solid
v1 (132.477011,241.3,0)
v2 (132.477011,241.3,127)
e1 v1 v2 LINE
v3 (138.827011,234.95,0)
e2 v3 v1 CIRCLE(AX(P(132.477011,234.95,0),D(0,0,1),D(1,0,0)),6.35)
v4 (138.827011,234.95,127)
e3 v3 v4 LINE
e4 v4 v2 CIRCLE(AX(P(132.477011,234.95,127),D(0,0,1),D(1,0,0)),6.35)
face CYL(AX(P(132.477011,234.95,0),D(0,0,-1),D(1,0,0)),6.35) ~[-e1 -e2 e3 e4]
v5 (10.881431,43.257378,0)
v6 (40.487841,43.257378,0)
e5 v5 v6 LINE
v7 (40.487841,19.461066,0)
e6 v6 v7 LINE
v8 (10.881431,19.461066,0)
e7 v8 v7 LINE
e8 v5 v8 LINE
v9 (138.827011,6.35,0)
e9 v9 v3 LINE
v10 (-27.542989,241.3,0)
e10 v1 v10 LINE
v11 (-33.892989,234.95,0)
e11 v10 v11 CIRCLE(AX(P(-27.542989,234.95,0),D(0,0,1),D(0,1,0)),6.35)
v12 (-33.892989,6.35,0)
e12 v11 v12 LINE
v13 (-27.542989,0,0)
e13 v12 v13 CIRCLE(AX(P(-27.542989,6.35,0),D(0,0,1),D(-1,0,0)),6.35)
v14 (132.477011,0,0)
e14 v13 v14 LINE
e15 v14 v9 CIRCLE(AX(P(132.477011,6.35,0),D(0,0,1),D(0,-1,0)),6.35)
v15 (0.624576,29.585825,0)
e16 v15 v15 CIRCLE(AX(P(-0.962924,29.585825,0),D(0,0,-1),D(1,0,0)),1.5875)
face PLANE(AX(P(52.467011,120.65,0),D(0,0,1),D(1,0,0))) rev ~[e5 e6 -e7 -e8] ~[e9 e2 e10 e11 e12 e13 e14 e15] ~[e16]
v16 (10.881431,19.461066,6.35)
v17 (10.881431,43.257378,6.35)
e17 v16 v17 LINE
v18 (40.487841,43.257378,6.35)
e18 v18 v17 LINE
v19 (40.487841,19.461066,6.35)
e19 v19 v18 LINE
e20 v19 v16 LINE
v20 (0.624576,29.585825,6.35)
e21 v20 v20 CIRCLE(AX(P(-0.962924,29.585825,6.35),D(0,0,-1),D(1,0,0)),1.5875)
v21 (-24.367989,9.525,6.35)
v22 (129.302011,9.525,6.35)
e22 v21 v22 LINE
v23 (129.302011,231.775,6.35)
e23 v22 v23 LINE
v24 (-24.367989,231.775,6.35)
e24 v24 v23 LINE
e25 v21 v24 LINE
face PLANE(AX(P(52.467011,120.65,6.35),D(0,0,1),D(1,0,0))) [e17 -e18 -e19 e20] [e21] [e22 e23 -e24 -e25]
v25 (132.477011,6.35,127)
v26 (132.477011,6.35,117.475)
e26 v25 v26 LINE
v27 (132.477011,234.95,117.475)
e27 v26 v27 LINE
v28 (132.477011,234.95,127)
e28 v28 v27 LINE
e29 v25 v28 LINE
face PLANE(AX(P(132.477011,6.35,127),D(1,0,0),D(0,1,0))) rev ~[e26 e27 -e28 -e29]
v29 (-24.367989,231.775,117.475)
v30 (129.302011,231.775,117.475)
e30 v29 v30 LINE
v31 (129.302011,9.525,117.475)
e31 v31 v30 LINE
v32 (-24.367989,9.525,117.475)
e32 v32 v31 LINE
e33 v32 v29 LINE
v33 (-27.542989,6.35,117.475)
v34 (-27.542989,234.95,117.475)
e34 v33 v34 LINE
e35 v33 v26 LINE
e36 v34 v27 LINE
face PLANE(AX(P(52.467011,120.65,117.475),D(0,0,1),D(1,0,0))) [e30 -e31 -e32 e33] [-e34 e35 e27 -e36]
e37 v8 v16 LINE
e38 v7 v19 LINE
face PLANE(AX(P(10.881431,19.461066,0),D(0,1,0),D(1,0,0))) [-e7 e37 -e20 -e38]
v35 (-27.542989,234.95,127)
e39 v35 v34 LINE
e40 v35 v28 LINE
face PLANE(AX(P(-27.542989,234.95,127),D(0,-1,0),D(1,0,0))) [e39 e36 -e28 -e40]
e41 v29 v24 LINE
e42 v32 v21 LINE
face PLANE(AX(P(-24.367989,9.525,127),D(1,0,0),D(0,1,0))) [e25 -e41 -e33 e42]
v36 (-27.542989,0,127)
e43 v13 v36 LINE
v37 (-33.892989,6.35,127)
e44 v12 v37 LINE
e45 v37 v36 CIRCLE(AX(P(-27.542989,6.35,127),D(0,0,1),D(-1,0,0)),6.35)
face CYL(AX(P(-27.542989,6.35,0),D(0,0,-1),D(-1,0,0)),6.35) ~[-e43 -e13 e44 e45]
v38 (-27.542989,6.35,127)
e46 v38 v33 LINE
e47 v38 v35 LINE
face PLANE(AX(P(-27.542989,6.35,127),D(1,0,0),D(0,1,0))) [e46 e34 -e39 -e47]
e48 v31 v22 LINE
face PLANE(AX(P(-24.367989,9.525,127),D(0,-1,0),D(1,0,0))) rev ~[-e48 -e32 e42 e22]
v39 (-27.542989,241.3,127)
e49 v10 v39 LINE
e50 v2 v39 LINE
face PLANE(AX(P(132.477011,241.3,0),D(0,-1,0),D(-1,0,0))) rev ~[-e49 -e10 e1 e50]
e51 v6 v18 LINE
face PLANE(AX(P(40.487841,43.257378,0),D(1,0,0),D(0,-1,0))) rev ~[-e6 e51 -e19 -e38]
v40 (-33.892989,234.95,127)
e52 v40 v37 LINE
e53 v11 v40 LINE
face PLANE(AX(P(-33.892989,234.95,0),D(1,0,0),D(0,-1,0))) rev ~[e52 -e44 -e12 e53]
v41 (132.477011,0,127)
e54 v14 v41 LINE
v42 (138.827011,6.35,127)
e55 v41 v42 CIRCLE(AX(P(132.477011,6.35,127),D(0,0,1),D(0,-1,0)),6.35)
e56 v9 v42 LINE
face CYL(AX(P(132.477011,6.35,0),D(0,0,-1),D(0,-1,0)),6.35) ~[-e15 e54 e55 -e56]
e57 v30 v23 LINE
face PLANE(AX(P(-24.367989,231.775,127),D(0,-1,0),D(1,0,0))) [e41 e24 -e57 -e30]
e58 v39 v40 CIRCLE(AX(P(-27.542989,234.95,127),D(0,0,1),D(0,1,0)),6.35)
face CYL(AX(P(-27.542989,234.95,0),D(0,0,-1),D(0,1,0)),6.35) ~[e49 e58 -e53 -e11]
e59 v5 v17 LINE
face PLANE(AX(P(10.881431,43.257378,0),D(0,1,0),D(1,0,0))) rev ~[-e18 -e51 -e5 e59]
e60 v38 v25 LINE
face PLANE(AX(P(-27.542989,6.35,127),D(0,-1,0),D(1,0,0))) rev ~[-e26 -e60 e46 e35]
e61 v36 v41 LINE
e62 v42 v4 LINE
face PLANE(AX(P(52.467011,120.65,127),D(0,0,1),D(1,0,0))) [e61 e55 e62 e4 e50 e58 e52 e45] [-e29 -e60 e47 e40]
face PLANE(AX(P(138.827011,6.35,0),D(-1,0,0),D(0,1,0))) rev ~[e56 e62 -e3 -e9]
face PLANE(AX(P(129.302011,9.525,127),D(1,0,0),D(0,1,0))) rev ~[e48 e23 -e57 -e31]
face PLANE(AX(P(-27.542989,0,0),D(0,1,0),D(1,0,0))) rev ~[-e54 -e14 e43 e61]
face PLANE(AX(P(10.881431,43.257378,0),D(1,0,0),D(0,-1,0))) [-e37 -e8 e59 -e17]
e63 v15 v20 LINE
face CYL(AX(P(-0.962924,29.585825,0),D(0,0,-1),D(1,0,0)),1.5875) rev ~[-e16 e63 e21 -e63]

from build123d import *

# Parameters (mm, degrees)
F1_DEPTH = 127
F2_T     = 6.35
F3_W     = 160.02
F3_H     = 228.6
F3_W_2   = 153.67
F3_H_2   = 222.25
F4_DEPTH = 127
F5_DEPTH = 9.525
F6_R     = 1.5875
F7_DEPTH = 25.4
F8_W     = 29.6064093709
F8_H     = 23.796312511
F9_DEPTH = 25.4


# Not quite as in the source:
# - a shell that OpenCascade refuses in one call is made with other operations: the cavity is built on its own and cut out


with BuildPart() as f1:
    # F0 (on Top) → F1 (new body)
    with BuildSketch(Plane.XY):
        with BuildLine():
            ThreePointArc((-33.8929891586, 6.35), (-32.0331172192, 1.8598719395), (-27.5429891586, 0))
            Line((-27.5429891586, 0), (132.4770108414, 0))
            ThreePointArc((132.4770108414, 0), (136.9671389019, 1.8598719395), (138.8270108414, 6.35))
            Line((138.8270108414, 6.35), (138.8270108414, 234.95))
            ThreePointArc((138.8270108414, 234.95), (136.9671389019, 239.4401280605), (132.4770108414, 241.3))
            Line((132.4770108414, 241.3), (-27.5429891586, 241.3))
            ThreePointArc((-27.5429891586, 241.3), (-32.0331172192, 239.4401280605), (-33.8929891586, 234.95))
            Line((-33.8929891586, 234.95), (-33.8929891586, 6.35))
        make_face()
    extrude(amount=F1_DEPTH)

    # F2: shell of thickness 6.35, made by hand


with BuildPart() as f2_core1:
    # F2_t2: copy of F1
    add(f1.part)

    # the walls: a layer under each face that stays
    f2_faces = [f2_core1.faces().sort_by_distance(p)[0] for p in [
        (52.4670108414, 0, 63.5),
        (138.8270108414, 120.65, 63.5),
        (52.4670108414, 241.3, 63.5),
        (-33.8929891586, 120.65, 63.5),
        (52.4670108414, 120.65, 0),
    ]]
    thicken(f2_faces, amount=-F2_T, mode=Mode.SUBTRACT)


with BuildPart() as f1_1:
    add(f1.part)

    # what is left inside the walls is the cavity
    f2_cavity = [f2_core1.part.solids().sort_by_distance(p)[0] for p in [
        (52.467011, 82.55, 6.4135),
    ]]
    add(f2_cavity, mode=Mode.SUBTRACT)

    # F3 (on face) → F4 (join)
    with BuildSketch(Plane.XY.offset(127)):
        with Locations((52.4670108414, 120.65)):
            Rectangle(F3_W, F3_H)
        with Locations((52.4670108414, 120.65)):
            Rectangle(F3_W_2, F3_H_2, mode=Mode.SUBTRACT)
    extrude(amount=-F4_DEPTH)

    # F3 (on face) → F5 (cut)
    with BuildSketch(Plane.XY.offset(127)):
        with Locations((52.4670108414, 120.65)):
            Rectangle(F3_W, F3_H)
        with Locations((52.4670108414, 120.65)):
            Rectangle(F3_W_2, F3_H_2, mode=Mode.SUBTRACT)
    extrude(amount=-F5_DEPTH, mode=Mode.SUBTRACT)

    # F6 (on face) → F7 (cut)
    with BuildSketch(Plane(origin=(0, 0, 0), x_dir=(1, 0, 0), z_dir=(0, 0, -1))):
        with Locations((-0.9629237612, -29.5858253049)):
            Circle(F6_R)
    extrude(amount=-F7_DEPTH, mode=Mode.SUBTRACT)

    # F8 (on face) → F9 (cut)
    with BuildSketch(Plane(origin=(0, 0, 0), x_dir=(1, 0, 0), z_dir=(0, 0, -1))):
        with Locations((25.6846360862, -31.3592217863)):
            Rectangle(F8_W, F8_H)
    extrude(amount=-F9_DEPTH, mode=Mode.SUBTRACT)


solid = f1_1.part
